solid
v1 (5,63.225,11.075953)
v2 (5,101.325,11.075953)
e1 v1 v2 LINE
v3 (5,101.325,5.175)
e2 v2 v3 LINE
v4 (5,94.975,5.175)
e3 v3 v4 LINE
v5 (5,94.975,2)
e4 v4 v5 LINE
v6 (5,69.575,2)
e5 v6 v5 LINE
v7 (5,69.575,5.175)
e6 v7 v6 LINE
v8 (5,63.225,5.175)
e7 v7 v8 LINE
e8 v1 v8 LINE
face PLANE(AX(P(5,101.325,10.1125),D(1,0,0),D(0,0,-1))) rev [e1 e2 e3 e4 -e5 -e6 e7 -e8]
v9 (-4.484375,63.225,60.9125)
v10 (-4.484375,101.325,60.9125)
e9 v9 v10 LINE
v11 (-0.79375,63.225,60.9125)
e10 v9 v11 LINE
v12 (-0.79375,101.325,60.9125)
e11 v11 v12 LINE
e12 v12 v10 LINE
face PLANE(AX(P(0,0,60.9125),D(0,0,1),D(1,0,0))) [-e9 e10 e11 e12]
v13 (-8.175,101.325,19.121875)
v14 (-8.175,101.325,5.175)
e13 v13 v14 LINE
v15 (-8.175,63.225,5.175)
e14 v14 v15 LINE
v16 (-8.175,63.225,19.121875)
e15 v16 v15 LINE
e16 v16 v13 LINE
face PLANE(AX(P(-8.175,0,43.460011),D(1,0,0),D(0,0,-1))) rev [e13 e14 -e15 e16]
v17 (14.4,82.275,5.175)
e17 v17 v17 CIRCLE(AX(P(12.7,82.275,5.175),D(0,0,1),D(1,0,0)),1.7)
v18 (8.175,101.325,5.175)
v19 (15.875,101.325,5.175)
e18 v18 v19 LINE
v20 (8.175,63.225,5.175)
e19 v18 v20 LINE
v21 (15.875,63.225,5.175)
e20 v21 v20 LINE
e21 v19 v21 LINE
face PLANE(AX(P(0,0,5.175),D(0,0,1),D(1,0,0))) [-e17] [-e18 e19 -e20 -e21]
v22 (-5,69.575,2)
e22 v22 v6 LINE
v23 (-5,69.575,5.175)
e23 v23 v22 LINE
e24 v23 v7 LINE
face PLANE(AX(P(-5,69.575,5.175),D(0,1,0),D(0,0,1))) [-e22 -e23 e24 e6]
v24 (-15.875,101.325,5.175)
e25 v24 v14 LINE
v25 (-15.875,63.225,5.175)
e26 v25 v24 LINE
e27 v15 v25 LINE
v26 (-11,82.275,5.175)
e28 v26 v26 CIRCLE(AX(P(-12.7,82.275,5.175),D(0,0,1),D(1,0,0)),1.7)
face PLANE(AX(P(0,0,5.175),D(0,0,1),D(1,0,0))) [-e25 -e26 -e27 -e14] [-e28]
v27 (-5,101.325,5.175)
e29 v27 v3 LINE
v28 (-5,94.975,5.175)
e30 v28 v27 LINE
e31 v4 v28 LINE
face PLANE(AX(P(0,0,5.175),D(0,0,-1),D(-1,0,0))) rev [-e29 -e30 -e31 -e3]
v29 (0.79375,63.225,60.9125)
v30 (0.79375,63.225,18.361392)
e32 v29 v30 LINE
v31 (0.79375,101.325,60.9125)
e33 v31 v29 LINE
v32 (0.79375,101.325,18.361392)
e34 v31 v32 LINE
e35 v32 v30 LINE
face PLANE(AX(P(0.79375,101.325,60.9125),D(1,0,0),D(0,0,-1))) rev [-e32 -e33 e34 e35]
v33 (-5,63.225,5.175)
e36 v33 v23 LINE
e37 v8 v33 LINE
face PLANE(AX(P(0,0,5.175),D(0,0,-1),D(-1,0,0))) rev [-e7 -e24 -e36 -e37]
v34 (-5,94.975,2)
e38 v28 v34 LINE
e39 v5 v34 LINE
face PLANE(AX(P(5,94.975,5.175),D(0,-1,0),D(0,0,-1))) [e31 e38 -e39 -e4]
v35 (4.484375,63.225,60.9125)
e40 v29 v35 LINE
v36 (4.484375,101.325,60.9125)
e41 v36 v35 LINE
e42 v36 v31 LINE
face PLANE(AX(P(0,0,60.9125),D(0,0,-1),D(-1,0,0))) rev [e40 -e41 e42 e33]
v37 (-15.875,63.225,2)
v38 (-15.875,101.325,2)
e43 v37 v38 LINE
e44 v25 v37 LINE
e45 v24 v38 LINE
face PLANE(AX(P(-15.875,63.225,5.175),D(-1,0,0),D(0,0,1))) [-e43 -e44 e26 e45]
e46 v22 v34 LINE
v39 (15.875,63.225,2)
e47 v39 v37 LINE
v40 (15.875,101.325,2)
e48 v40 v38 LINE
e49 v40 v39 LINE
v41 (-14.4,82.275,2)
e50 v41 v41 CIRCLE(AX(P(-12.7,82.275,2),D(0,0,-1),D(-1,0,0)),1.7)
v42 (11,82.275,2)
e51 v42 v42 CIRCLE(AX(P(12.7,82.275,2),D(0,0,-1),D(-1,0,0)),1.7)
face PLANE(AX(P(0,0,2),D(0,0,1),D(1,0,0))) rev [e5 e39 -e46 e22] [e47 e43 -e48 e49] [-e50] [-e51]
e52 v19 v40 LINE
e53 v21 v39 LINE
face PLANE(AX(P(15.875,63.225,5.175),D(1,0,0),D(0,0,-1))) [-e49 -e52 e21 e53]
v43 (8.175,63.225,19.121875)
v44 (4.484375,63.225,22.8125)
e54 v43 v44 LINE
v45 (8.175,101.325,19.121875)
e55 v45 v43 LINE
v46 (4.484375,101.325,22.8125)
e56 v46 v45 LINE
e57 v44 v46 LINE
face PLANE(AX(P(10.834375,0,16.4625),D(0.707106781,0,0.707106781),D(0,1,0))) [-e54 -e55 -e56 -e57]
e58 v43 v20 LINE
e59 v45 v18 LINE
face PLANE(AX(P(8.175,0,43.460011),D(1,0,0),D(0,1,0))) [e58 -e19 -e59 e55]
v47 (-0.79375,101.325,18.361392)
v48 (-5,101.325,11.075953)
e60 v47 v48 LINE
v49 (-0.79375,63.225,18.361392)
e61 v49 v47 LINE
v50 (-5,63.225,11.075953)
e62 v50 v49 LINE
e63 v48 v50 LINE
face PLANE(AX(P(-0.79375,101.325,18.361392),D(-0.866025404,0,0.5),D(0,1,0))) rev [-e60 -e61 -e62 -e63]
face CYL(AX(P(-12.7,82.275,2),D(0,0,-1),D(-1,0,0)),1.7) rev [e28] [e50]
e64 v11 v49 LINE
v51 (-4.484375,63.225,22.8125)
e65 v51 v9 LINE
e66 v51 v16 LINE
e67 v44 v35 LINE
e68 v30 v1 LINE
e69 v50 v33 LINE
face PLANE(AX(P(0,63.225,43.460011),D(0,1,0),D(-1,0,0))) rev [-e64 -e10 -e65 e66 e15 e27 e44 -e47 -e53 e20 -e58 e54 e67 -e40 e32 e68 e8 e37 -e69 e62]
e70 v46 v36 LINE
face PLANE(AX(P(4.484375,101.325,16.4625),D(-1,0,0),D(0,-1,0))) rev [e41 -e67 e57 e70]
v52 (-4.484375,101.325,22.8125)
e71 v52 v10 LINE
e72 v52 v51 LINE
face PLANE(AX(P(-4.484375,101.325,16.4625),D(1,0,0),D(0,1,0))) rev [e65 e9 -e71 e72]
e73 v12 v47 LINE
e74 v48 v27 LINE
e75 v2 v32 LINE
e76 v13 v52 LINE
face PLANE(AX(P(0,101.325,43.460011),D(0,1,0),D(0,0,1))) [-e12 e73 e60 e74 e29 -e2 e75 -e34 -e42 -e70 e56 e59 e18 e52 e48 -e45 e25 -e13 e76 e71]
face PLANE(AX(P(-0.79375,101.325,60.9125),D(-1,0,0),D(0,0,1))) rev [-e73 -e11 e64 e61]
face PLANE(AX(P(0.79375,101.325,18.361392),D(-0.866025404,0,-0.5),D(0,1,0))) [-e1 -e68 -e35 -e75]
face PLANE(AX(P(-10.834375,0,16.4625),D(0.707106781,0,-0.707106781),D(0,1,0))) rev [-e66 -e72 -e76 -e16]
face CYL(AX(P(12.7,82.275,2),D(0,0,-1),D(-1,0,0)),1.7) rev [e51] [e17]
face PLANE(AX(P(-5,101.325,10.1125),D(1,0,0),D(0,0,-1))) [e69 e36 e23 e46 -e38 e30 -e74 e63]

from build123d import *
from build123d.topology import SkipClean

# Parameters (mm, degrees)
SKETCH1_W                     = 10
SKETCH1_H                     = 170.55
SKETCH1_R                     = 2.5
BOSS_EXTRUDE1_DEPTH           = 2
SKETCH2_W                     = 10
SKETCH2_H                     = 170.55
SKETCH2_R                     = 2.95
BOSS_EXTRUDE2_DEPTH           = 1
SKETCH3_W                     = 69.85
SKETCH3_H                     = 10.16
SKETCH3_R                     = 1.86055
BOSS_EXTRUDE3_DEPTH           = 2.5
FILLET1_START                 = -1
FILLET1_DEPTH                 = 10.16
FILLET1_START_2               = -17.7000001
FILLET1_2_DEPTH               = 35.4000001
FILLET1_START_3               = -5
FILLET1_3_DEPTH               = 10
SKETCH4_W                     = 10
SKETCH4_H                     = 13.05
BOSS_EXTRUDE4_DEPTH           = 3
SKETCH4_3_W                   = 3.175
SKETCH4_3_H                   = 38.1
BOSS_EXTRUDE5_DEPTH           = 11.1125
SKETCH5_W                     = 7.38125
SKETCH5_H                     = 38.1
BOSS_EXTRUDE6_DEPTH           = 50.8
SKETCH6_W                     = 3.690625
SKETCH6_H                     = 38.1
CUT_EXTRUDE1_DEPTH            = 44.45
CHAMFER1_SIZE                 = 4.7625
CHAMFER1_SIZE_2               = 8.248891971
SKETCH7_W                     = 69.85
SKETCH7_H                     = 10.16
CUT_EXTRUDE2_DEPTH            = 145.5
SKETCH8_W                     = 31.75
SKETCH8_H                     = 38.1
BOSS_EXTRUDE7_DEPTH           = 3.175
SKETCH9_W                     = 10
SKETCH9_H                     = 3.175
SKETCH9_W_2                   = 16.35
SKETCH9_H_2                   = 3
CUT_EXTRUDE3_DEPTH            = 74.579605063
CHAMFER2_SIZE                 = 6.35
CHAMFER3_SIZE                 = 6.35
SKETCH11_W                    = 1.7
SKETCH11_H                    = 58.9125
M3_CLEARANCE_HOLE1_AT_2_COUNT = 2
M3_CLEARANCE_HOLE1_AT_2_PITCH = 25.4
SKETCH13_W                    = 10
SKETCH13_H                    = 6.35
BOSS_EXTRUDE8_DEPTH           = 3.175


with BuildPart() as part:
    # Sketch1 → Boss-Extrude1 (new body)
    with BuildSketch(Plane.XY):
        with Locations((0, 3)):
            Rectangle(SKETCH1_W, SKETCH1_H)
        with Locations((0, 82.275)):
            Circle(SKETCH1_R, mode=Mode.SUBTRACT)
    extrude(amount=BOSS_EXTRUDE1_DEPTH)

    # Sketch2 → Boss-Extrude2 (add)
    with BuildSketch(Plane(origin=(0, 0, 0), x_dir=(-1, 0, 0), z_dir=(0, 0, -1))):
        with Locations((0, 3)):
            Rectangle(SKETCH2_W, SKETCH2_H)
        with Locations((0, 82.275)):
            Circle(SKETCH2_R, mode=Mode.SUBTRACT)
    extrude(amount=BOSS_EXTRUDE2_DEPTH)

    # Sketch3 → Boss-Extrude3 (add)
    with BuildSketch(Plane.XZ.offset(82.275)):
        with Locations((0, 4.08)):
            Rectangle(SKETCH3_W, SKETCH3_H)
        with Locations(Location((28.575, 4.08, 0), (0, 0, 270))):
            Circle(SKETCH3_R, mode=Mode.SUBTRACT)
        with Locations(Location((-28.575, 4.08, 0), (0, 0, 270))):
            Circle(SKETCH3_R, mode=Mode.SUBTRACT)
    extrude(amount=-BOSS_EXTRUDE3_DEPTH)

    # Fillet1: read off the stored shape, not the designer's step
    # Fillet1 outline → Fillet1 (add)
    with BuildSketch(Plane.XY.offset(FILLET1_START)):
        with BuildLine():
            Line((5, -79.775), (17.7, -79.775))
            ThreePointArc((17.7, -79.775), (8.719743879, -76.055256121), (5, -67.075))
            Line((5, -67.075), (5, -79.775))
        make_face()
        with BuildLine():
            Line((-17.7, -79.775), (-5, -79.775))
            Line((-5, -79.775), (-5, -67.075))
            ThreePointArc((-5, -67.075), (-8.719743879, -76.055256121), (-17.7, -79.775))
        make_face()
    extrude(amount=FILLET1_DEPTH)

    # Fillet1 2 outline → Fillet1 2 (cut)
    with BuildSketch(Plane.YZ.offset(FILLET1_START_2)):
        with BuildLine():
            Line((-66, 9.16), (-79.775009155, 9.160018885))
            ThreePointArc((-79.775009155, 9.160018885), (-75.089891257, 3.937849653), (-68.347034302, 2))
            Line((-68.347034302, 2), (-66, 2))
            Line((-66, 2), (-66, 9.16))
        make_face()
    extrude(amount=FILLET1_2_DEPTH, mode=Mode.SUBTRACT)

    # Fillet1 3 outline → Fillet1 3 (add)
    with BuildSketch(Plane.YZ.offset(FILLET1_START_3)):
        with BuildLine():
            ThreePointArc((-68.347034302, 2), (-75.089891257, 3.937849653), (-79.775009155, 9.160018885))
            Line((-79.775009155, 9.160018885), (-79.775, 0))
            Line((-79.775, 0), (-66, 0))
            Line((-66, 0), (-66, 2))
            Line((-66, 2), (-68.347034302, 2))
        make_face()
    extrude(amount=FILLET1_3_DEPTH)

    # Sketch4 → Boss-Extrude4 (add)
    with SkipClean():  # the faces are left unmerged after this step: merging them gives an invalid solid
        with BuildSketch(Plane(origin=(0, 0, -1), x_dir=(-1, 0, 0), z_dir=(0, 0, -1))):
            Polygon((8.175, 63.225), (8.175, 101.325), (5, 101.325), (5, 88.275), (5, 63.225), align=None)
            with Locations((0, 94.8)):
                Rectangle(SKETCH4_W, SKETCH4_H)
            Polygon((-5, 88.275), (-5, 101.325), (-8.175, 101.325), (-8.175, 63.225), (-5, 63.225), align=None)
        extrude(amount=-BOSS_EXTRUDE4_DEPTH)

    # Sketch4<3> → Boss-Extrude5 (add)
    with SkipClean():  # the faces are left unmerged after this step: merging them gives an invalid solid
        with BuildSketch(Plane(origin=(0, 0, -1), x_dir=(-1, 0, 0), z_dir=(0, 0, -1))):
            with Locations((6.5875, 82.275)):
                Rectangle(SKETCH4_3_W, SKETCH4_3_H)
            with Locations((-6.5875, 82.275)):
                Rectangle(SKETCH4_3_W, SKETCH4_3_H)
        extrude(amount=-BOSS_EXTRUDE5_DEPTH)

    # Sketch5 → Boss-Extrude6 (add)
    with SkipClean():  # the faces are left unmerged after this step: merging them gives an invalid solid
        with BuildSketch(Plane.XY.offset(10.1125)):
            with Locations((-4.484375, 82.275)):
                Rectangle(SKETCH5_W, SKETCH5_H)
            with Locations((4.484375, 82.275)):
                Rectangle(SKETCH5_W, SKETCH5_H)
        extrude(amount=BOSS_EXTRUDE6_DEPTH)

    # Sketch6 → Cut-Extrude1 (cut)
    with SkipClean():  # the faces are left unmerged after this step: merging them gives an invalid solid
        with BuildSketch(Plane.XY.offset(60.9125)):
            with Locations((-6.3296875, 82.275)):
                Rectangle(SKETCH6_W, SKETCH6_H)
            with Locations((6.3296875, 82.275)):
                Rectangle(SKETCH6_W, SKETCH6_H)
        extrude(amount=-CUT_EXTRUDE1_DEPTH, mode=Mode.SUBTRACT)

    # Chamfer1
    # the kernel refuses this chamfer: 8.248891971, 4.7625 mm, written as the material it takes off along each edge
    with BuildSketch(Plane(origin=(-0.79375, 122.66559091, 10.1125), x_dir=(-1, 0, 0), z_dir=(0, -1, 0))) as chamfer1_piece_1_section:
        Polygon((CHAMFER1_SIZE, 0), (0, -CHAMFER1_SIZE_2), (0, 0), align=None)
    chamfer1_piece_1 = extrude(amount=80.78118182, mode=Mode.PRIVATE)
    chamfer1_piece_1 = split(chamfer1_piece_1, bisect_by=Plane(origin=(-5, 122.66559091, 10.1125), z_dir=(1, 0, 0)), keep=Keep.TOP, mode=Mode.PRIVATE)
    add(chamfer1_piece_1, mode=Mode.SUBTRACT)
    with BuildSketch(Plane(origin=(0.79375, 122.66559091, 10.1125), x_dir=(1, 0, 0), z_dir=(0, -1, 0))) as chamfer1_piece_2_section:
        Polygon((CHAMFER1_SIZE, 0), (0, CHAMFER1_SIZE_2), (0, 0), align=None)
    chamfer1_piece_2 = extrude(amount=80.78118182, mode=Mode.PRIVATE)
    chamfer1_piece_2 = split(chamfer1_piece_2, bisect_by=Plane(origin=(5, 122.66559091, 10.1125), z_dir=(-1, 0, 0)), keep=Keep.TOP, mode=Mode.PRIVATE)
    add(chamfer1_piece_2, mode=Mode.SUBTRACT)

    # Sketch7 → Cut-Extrude2 (cut)
    with BuildSketch(Plane.XZ.offset(82.275)):
        with Locations((0, 4.08)):
            Rectangle(SKETCH7_W, SKETCH7_H)
    extrude(amount=-CUT_EXTRUDE2_DEPTH, mode=Mode.SUBTRACT)


with BuildPart() as cut_extrude2_kept_piece:
    # of the separate pieces the step leaves, the one the design keeps (cut_extrude2_pieces_kept)
    add(part.part.solids().sort_by_distance((-8.175, 63.225, -1))[0])

    # Sketch8 → Boss-Extrude7 (add)
    with BuildSketch(Plane(origin=(0, 0, 2), x_dir=(-1, 0, 0), z_dir=(0, 0, -1))):
        with Locations((0, 82.275)):
            Rectangle(SKETCH8_W, SKETCH8_H)
    extrude(amount=-BOSS_EXTRUDE7_DEPTH)

    # Sketch9 → Cut-Extrude3 (cut, through all)
    with BuildSketch(Plane(origin=(0, 101.325, 0), x_dir=(1, 0, 0), z_dir=(0, 1, 0))):
        with Locations((0, -3.5875)):
            Rectangle(SKETCH9_W, SKETCH9_H)
        with Locations((0, -0.5)):
            Rectangle(SKETCH9_W_2, SKETCH9_H_2)
    extrude(amount=-CUT_EXTRUDE3_DEPTH, mode=Mode.SUBTRACT)


with BuildPart() as cut_extrude3_piece_1:
    # of the separate pieces the step leaves, piece 1, a body of its own (cut_extrude3_pieces)
    add(cut_extrude2_kept_piece.part.solids().sort_by_distance((-15.875, 101.325, 2))[0])

    # Chamfer3
    # the kernel refuses this chamfer: 6.35 mm, written as the material it adds along each edge
    with BuildSketch(Plane(origin=(-4.484375, 101.325, 16.4625), x_dir=(-1, 0, 0), z_dir=(0, -1, 0))) as chamfer3_piece_1_section:
        Polygon((CHAMFER3_SIZE, 0), (0, -CHAMFER3_SIZE), (0, 0), align=None)
    chamfer3_piece_1 = extrude(amount=38.1, mode=Mode.PRIVATE)
    chamfer3_piece_1 = split(chamfer3_piece_1, bisect_by=Plane(origin=(-8.175, 101.325, 16.4625), z_dir=(1, 0, 0)), keep=Keep.TOP, mode=Mode.PRIVATE)
    add(chamfer3_piece_1)

    # Sketch11 → M3 Clearance Hole1 (revolve, cut)
    with BuildSketch(Plane(origin=(-12.7, 82.275, 2), x_dir=(0, 1, 0), z_dir=(1, 0, 0))):
        with Locations((0.85, 29.45625)):
            Rectangle(SKETCH11_W, SKETCH11_H)
    m3_clearance_hole1 = revolve(axis=Axis((-12.7, 82.275, -4.35), (0, 0, 1)), mode=Mode.SUBTRACT)



with BuildPart() as cut_extrude3_piece_2:
    # of the separate pieces the step leaves, piece 2, a body of its own (cut_extrude3_pieces)
    add(cut_extrude2_kept_piece.part.solids().sort_by_distance((15.875, 101.325, 2))[0])

    # Chamfer2
    # the kernel refuses this chamfer: 6.35 mm, written as the material it adds along each edge
    with BuildSketch(Plane(origin=(4.484375, 101.325, 16.4625), x_dir=(1, 0, 0), z_dir=(0, -1, 0))) as chamfer2_piece_1_section:
        Polygon((CHAMFER2_SIZE, 0), (0, CHAMFER2_SIZE), (0, 0), align=None)
    chamfer2_piece_1 = extrude(amount=38.1, mode=Mode.PRIVATE)
    chamfer2_piece_1 = split(chamfer2_piece_1, bisect_by=Plane(origin=(8.175, 101.325, 16.4625), z_dir=(-1, 0, 0)), keep=Keep.TOP, mode=Mode.PRIVATE)
    add(chamfer2_piece_1)

    # M3 Clearance Hole1 at 2: M3 Clearance Hole1 ×2
    with Locations(*[(i * M3_CLEARANCE_HOLE1_AT_2_PITCH, 0, 0) for i in range(1, M3_CLEARANCE_HOLE1_AT_2_COUNT)]):
        add(m3_clearance_hole1, mode=Mode.SUBTRACT)


with BuildPart() as cut_extrude3_piece_1_1:
    add(cut_extrude3_piece_1.part)

    add(cut_extrude3_piece_2.part)  # Boss-Extrude8 merges Cut-Extrude3 piece 2
    # Sketch13 → Boss-Extrude8 (add)
    with BuildSketch(Plane(origin=(0, 0, 2), x_dir=(-1, 0, 0), z_dir=(0, 0, -1))):
        with Locations((0, 98.15)):
            Rectangle(SKETCH13_W, SKETCH13_H)
        with Locations((0, 66.4)):
            Rectangle(SKETCH13_W, SKETCH13_H)
    extrude(amount=-BOSS_EXTRUDE8_DEPTH)


solid = cut_extrude3_piece_1_1.part
